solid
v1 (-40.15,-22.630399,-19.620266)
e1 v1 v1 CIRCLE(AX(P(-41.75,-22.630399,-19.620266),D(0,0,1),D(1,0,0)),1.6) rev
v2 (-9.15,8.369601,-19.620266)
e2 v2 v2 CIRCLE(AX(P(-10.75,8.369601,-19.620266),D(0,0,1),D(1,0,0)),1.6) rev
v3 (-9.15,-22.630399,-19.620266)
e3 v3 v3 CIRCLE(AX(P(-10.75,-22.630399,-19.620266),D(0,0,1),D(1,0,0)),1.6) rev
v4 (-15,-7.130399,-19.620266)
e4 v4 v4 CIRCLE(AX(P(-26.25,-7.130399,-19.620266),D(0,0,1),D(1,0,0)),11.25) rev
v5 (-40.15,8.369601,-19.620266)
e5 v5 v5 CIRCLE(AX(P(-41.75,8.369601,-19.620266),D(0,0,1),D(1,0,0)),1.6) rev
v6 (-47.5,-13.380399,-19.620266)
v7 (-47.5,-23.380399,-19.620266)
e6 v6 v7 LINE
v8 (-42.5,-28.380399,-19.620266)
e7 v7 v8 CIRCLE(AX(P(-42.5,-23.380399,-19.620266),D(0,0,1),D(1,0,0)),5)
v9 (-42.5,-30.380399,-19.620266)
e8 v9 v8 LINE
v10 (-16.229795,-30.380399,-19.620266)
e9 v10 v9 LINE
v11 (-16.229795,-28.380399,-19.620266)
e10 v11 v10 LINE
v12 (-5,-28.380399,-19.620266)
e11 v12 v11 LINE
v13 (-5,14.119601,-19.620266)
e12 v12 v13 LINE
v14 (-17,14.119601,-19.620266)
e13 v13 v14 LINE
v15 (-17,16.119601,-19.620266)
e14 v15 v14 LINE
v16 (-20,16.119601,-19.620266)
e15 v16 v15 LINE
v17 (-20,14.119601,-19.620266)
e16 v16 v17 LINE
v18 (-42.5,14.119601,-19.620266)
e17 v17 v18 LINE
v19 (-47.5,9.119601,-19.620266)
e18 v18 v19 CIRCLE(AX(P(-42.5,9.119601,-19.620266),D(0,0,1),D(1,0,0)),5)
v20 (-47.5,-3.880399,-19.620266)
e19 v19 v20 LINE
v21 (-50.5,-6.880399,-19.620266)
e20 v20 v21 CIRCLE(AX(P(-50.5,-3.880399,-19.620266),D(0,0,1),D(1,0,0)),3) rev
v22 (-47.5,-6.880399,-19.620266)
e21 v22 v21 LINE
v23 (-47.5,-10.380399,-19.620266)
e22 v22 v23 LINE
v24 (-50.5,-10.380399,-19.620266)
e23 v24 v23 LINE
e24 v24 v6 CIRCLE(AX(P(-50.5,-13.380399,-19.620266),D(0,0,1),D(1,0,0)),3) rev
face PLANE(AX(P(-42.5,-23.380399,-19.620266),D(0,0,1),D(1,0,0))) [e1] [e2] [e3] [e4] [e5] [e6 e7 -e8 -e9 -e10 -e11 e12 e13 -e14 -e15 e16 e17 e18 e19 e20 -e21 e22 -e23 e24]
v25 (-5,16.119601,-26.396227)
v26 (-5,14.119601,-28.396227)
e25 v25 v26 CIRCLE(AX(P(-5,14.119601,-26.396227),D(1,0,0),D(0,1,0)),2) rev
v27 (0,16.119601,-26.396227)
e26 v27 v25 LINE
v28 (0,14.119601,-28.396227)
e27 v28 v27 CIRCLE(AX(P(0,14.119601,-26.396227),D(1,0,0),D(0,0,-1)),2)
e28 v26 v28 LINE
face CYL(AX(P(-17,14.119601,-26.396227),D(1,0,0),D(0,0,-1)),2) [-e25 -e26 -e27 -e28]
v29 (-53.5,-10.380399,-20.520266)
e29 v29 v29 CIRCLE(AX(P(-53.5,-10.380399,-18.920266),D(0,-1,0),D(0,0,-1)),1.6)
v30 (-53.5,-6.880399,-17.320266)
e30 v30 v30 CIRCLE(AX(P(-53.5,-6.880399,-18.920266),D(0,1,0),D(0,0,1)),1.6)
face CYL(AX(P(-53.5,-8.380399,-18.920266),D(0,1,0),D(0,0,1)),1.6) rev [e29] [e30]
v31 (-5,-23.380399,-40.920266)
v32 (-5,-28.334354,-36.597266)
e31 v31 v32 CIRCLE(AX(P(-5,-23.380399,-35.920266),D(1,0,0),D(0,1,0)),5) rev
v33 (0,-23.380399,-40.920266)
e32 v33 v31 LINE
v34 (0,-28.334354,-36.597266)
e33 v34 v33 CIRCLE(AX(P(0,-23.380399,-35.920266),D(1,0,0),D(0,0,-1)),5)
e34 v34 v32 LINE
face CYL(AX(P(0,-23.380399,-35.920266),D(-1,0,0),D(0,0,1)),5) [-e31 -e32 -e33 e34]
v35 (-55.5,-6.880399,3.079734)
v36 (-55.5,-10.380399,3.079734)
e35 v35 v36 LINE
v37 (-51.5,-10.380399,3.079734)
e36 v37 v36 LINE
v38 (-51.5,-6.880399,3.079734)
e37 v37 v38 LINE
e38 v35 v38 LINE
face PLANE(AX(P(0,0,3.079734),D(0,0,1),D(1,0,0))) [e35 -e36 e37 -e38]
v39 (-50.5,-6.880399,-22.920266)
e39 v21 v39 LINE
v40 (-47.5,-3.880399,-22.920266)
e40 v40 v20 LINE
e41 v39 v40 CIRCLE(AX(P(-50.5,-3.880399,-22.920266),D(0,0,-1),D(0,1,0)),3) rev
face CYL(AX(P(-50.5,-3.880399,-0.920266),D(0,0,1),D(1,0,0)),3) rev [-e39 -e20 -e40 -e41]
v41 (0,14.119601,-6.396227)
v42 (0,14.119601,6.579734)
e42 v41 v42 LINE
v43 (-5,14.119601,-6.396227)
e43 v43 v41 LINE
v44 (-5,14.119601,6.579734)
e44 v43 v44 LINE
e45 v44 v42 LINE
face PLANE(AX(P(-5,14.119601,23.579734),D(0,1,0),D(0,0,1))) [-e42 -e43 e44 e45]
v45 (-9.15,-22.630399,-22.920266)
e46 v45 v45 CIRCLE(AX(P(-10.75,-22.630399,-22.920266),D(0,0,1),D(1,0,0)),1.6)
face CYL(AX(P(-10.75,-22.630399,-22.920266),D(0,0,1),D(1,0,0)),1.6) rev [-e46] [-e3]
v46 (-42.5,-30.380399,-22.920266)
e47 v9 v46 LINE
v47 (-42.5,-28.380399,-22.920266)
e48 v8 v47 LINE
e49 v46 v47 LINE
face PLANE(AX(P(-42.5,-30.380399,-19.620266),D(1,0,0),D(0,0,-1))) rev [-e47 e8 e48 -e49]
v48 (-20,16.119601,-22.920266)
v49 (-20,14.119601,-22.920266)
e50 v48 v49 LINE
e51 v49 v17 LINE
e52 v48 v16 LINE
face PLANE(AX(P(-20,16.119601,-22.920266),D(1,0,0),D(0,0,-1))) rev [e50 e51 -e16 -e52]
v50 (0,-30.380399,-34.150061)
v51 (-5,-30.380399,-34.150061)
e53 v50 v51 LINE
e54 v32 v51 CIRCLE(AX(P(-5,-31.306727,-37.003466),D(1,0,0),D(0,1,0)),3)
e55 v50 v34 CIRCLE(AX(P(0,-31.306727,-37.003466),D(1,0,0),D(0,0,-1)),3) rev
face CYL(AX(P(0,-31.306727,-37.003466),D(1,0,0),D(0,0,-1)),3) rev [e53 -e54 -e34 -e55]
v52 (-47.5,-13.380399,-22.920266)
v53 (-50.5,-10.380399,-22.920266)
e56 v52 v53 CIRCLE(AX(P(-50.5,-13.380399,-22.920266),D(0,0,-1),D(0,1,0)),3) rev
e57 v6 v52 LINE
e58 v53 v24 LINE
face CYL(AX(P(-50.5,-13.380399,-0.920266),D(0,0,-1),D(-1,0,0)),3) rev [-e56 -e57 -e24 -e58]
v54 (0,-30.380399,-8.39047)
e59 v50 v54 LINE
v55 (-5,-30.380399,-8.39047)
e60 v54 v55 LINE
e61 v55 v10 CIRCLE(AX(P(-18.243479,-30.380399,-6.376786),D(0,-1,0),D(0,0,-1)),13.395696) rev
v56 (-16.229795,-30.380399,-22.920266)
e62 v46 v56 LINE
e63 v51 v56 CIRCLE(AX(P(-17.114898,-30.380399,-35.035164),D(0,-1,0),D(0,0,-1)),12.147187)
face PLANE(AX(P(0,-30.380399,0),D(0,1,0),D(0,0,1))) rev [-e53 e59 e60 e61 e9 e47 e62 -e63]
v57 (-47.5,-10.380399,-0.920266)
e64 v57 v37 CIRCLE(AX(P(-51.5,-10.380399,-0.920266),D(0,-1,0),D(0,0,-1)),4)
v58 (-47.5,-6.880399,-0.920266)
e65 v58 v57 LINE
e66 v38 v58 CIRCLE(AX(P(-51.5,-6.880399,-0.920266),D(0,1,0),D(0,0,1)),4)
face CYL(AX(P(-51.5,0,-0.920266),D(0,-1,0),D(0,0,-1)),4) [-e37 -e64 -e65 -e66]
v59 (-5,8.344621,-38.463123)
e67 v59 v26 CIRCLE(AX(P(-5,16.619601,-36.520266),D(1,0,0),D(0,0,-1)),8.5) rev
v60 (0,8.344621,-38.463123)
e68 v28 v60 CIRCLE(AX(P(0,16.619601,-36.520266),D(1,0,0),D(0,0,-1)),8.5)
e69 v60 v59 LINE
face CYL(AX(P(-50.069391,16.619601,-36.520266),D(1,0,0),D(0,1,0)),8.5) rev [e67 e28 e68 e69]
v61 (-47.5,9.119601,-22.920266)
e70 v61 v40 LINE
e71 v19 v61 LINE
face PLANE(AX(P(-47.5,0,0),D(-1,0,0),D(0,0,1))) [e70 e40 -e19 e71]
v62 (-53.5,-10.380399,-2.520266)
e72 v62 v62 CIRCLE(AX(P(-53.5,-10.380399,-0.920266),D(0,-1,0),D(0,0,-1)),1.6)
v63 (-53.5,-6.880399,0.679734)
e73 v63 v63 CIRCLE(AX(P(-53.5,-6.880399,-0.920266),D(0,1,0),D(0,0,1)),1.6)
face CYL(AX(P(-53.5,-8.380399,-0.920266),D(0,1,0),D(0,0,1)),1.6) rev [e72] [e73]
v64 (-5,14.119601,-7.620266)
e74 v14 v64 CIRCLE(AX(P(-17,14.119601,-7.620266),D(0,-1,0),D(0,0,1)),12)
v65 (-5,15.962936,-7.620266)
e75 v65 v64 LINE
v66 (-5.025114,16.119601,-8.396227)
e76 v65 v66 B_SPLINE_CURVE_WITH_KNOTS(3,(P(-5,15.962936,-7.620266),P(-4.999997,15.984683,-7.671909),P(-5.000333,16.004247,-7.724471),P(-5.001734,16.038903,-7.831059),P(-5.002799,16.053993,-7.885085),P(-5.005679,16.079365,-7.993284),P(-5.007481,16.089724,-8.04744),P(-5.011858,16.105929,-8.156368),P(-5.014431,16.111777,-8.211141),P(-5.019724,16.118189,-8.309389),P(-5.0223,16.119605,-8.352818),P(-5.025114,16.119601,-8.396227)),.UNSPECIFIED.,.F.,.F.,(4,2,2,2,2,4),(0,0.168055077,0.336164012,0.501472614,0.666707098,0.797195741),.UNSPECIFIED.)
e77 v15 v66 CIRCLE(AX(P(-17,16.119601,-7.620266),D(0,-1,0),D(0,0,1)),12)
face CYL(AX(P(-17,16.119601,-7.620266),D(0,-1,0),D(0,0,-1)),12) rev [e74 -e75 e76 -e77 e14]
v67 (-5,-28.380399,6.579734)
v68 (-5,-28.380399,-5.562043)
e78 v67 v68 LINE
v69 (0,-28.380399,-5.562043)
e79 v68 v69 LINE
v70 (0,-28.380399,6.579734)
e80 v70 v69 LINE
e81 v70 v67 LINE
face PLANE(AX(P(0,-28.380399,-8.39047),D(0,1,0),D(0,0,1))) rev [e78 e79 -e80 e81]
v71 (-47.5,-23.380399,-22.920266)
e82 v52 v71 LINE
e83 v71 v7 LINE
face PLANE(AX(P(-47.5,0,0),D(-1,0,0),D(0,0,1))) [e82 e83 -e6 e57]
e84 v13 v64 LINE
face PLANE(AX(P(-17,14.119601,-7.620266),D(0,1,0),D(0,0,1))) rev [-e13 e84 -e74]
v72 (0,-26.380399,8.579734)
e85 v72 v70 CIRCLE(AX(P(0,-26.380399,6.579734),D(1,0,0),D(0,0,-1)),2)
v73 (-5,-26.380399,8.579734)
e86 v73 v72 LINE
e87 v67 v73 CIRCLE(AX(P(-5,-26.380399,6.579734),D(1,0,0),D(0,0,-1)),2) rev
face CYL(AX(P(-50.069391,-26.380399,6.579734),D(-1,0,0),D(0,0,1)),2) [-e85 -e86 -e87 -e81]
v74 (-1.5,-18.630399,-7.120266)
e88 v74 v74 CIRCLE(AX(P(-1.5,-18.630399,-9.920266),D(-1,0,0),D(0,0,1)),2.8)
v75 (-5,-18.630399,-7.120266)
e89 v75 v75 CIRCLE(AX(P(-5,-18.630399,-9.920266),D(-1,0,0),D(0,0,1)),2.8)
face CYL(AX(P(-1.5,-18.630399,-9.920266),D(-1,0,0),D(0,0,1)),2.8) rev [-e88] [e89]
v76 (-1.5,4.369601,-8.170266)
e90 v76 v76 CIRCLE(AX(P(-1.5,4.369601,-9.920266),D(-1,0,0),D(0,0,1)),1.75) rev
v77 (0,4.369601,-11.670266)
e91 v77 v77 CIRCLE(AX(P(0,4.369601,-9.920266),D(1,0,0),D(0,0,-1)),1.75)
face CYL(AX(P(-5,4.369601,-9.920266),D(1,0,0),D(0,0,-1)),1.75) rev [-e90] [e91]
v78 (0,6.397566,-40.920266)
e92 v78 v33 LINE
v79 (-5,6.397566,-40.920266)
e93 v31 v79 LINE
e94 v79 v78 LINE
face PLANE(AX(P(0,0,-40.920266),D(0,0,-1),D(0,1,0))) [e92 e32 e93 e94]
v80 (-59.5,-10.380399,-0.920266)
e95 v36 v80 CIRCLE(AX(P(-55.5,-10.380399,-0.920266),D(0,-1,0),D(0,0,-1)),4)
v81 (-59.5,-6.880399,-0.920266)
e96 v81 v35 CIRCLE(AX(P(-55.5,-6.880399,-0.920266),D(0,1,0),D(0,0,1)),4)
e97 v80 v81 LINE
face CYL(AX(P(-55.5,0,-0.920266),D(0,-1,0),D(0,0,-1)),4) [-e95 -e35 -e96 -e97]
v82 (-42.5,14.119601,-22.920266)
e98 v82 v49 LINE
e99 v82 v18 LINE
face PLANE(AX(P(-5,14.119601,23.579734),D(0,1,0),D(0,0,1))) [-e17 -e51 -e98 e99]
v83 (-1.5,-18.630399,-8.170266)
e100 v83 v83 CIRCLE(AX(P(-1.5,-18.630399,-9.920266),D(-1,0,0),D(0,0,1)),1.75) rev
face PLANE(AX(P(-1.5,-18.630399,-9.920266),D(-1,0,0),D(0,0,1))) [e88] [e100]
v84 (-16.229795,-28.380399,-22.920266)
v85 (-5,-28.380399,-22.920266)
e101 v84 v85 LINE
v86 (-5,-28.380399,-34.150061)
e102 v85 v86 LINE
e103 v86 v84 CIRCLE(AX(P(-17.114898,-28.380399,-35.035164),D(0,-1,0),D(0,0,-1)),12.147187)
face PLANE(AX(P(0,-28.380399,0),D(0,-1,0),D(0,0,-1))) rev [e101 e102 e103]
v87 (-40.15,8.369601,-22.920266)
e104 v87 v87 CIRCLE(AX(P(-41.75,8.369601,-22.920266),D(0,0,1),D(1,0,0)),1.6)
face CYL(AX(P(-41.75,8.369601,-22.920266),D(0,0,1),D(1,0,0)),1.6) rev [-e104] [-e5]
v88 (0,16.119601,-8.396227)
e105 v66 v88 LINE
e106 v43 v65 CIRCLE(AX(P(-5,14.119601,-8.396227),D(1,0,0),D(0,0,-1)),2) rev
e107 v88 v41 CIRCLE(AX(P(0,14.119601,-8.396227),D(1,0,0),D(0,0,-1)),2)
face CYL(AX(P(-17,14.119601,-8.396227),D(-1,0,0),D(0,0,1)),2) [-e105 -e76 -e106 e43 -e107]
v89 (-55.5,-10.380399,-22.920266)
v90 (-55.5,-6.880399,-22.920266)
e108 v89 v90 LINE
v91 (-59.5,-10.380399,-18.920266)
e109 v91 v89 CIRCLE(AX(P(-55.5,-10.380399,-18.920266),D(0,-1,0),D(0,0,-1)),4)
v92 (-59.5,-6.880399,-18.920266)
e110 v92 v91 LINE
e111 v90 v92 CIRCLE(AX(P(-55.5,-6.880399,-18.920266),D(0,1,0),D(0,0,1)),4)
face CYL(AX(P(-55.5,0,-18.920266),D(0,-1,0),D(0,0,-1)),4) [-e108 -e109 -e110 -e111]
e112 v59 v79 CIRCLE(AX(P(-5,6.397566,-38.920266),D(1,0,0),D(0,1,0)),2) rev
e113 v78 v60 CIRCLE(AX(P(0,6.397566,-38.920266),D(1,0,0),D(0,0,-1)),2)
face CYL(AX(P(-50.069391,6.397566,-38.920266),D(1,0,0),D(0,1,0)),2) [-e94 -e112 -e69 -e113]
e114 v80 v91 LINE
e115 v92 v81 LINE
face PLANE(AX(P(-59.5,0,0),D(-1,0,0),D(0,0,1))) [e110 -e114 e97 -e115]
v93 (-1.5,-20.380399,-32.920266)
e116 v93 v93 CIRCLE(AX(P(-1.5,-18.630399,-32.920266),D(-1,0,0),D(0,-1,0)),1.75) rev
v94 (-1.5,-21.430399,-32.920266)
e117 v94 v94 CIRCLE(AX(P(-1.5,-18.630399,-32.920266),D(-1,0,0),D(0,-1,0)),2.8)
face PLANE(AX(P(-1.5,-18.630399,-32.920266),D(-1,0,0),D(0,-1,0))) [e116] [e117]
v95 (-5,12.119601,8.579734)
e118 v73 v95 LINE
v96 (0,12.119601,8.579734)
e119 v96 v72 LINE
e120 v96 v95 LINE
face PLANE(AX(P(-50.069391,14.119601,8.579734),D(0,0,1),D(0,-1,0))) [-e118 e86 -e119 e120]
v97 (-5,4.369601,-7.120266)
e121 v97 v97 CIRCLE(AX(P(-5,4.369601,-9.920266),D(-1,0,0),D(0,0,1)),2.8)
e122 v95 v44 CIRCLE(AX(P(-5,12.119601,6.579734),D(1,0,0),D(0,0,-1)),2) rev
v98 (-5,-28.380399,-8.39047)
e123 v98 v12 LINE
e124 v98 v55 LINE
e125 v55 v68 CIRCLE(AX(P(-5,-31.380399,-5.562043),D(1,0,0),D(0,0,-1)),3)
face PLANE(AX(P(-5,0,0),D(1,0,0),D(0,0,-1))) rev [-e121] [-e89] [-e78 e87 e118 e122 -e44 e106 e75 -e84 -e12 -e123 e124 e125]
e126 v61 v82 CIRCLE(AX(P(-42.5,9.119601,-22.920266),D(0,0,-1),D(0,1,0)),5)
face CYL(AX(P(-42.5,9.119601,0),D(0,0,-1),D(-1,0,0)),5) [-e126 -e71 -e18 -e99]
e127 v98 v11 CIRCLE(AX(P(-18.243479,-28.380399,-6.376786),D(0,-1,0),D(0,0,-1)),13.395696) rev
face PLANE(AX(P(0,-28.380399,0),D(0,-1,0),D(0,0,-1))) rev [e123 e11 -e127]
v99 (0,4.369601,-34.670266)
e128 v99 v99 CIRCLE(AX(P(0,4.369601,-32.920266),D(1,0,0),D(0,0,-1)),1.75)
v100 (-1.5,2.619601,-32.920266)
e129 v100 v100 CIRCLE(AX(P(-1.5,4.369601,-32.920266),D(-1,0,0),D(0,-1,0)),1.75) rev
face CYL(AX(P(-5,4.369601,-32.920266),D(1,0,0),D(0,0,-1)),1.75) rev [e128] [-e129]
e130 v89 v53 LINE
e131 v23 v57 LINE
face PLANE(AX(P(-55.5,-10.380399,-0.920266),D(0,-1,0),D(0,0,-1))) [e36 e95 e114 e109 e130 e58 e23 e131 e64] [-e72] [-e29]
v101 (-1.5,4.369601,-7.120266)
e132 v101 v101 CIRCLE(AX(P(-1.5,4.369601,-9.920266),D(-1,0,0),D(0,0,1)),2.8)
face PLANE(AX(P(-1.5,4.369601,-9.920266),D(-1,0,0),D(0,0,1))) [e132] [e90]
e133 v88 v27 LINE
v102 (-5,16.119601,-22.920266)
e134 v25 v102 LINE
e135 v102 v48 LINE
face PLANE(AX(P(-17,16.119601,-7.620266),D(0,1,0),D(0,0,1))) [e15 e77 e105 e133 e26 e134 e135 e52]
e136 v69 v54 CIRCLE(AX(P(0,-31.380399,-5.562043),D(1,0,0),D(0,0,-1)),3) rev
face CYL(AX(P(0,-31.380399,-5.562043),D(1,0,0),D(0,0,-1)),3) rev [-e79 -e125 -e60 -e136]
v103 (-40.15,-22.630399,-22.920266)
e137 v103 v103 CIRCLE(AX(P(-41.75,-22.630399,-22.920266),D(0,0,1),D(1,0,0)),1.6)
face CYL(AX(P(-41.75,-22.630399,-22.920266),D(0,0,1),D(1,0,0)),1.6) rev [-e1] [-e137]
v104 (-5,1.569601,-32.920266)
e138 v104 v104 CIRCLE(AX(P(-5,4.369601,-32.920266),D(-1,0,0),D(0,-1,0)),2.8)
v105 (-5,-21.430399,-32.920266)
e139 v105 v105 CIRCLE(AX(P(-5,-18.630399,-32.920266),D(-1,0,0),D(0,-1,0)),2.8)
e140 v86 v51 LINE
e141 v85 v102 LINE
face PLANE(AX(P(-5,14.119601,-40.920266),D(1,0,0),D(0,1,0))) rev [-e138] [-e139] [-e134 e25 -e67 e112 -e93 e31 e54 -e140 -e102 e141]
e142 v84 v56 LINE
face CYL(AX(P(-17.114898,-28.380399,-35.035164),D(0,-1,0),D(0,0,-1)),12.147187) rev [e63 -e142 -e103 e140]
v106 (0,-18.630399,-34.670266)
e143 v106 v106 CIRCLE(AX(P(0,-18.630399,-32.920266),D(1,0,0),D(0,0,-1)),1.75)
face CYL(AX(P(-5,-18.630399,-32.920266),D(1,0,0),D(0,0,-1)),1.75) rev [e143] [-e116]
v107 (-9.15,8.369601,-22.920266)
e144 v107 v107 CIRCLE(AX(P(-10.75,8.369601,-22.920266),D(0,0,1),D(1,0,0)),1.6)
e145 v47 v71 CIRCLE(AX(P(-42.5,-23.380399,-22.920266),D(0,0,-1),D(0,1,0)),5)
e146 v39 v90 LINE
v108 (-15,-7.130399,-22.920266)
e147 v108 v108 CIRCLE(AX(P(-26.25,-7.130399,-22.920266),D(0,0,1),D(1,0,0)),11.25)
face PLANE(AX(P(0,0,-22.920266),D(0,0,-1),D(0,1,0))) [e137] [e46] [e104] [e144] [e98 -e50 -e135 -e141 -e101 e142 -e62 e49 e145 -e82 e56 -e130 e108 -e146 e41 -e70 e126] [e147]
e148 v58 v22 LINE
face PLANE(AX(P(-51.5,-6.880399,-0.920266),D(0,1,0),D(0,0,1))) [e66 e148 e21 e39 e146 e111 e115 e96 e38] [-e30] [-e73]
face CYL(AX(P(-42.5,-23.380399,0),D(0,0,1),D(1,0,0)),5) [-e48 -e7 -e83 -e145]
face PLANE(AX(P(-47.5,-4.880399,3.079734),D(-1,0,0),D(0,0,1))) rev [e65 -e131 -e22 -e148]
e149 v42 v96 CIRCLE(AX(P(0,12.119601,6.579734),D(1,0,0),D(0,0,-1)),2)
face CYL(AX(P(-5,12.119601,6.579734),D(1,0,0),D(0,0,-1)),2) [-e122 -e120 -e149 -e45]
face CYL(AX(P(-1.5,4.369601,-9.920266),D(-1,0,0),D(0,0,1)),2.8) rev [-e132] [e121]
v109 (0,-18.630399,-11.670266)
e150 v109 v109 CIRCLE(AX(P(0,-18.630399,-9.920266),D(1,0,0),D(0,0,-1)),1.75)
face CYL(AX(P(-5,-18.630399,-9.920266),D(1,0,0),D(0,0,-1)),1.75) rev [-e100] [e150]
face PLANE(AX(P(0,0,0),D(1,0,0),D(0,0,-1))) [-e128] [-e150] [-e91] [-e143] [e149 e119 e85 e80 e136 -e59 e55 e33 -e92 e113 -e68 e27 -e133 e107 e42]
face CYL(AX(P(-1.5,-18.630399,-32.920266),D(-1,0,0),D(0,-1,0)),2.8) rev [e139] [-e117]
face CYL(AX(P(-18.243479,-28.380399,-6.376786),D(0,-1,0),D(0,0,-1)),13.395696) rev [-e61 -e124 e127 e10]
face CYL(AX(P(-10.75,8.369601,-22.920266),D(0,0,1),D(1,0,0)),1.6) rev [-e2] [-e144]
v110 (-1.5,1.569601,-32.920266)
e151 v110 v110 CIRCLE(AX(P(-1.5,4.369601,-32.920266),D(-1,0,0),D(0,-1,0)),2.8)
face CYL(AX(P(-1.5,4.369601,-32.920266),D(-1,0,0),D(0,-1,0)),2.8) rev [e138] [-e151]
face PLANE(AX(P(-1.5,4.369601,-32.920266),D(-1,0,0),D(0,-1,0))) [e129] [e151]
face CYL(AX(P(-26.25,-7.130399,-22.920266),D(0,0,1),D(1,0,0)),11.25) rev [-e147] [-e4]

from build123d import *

# Parameters (mm, degrees)
CROQUIS1_W               = 42.5
CROQUIS1_H               = 42.5
SALIENTE_EXTRUIR1_DEPTH  = 5
CROQUIS6_W               = 5
CROQUIS6_H               = 42.5
SALIENTE_EXTRUIR2_DEPTH  = 4
CROQUIS7_W               = 4
CROQUIS7_H               = 42.5
SALIENTE_EXTRUIR3_DEPTH  = 42.5
CROQUIS8_R               = 11.25
CROQUIS8_R_2             = 1.6
CORTAR_EXTRUIR2_DEPTH    = 4
CROQUIS10_W              = 4
CROQUIS10_H              = 3.5
SALIENTE_EXTRUIR4_DEPTH  = 12
CROQUIS11_W              = 12
CROQUIS11_H              = 3.5
SALIENTE_EXTRUIR5_DEPTH  = 22
CROQUIS12_R              = 1.6
CORTAR_EXTRUIR4_DEPTH    = 3.5
REDONDEO1_R              = 5
REDONDEO2_R              = 5
REDONDEO3_R              = 4
CORTAR_EXTRUIR5_DEPTH    = 0.7
CROQUIS14_W              = 5
CROQUIS14_H              = 42.5
SALIENTE_EXTRUIR6_DEPTH  = 18
CROQUIS15_R              = 1.75
CORTAR_EXTRUIR6_DEPTH    = 5
CROQUIS16_R              = 2.8
CORTAR_EXTRUIR7_DEPTH    = 3.5
CROQUIS17_R              = 2.8
CORTAR_EXTRUIR8_DEPTH    = 3.5
REDONDEO5_R              = 5
CROQUIS18_R              = 1.6
SALIENTE_EXTRUIR8_DEPTH  = 2
CROQUIS19_R              = 1.6
CORTAR_EXTRUIR9_DEPTH    = 2
REDONDEO7_R              = 3
REDONDEO8_R              = 3
SALIENTE_EXTRUIR9_DEPTH  = 2
SALIENTE_EXTRUIR10_DEPTH = 2
CROQUIS22_W              = 26.97020456
CROQUIS22_H              = 2
CORTAR_EXTRUIR10_DEPTH   = 5
CROQUIS23_W              = 1.770204561
CROQUIS23_H              = 2
CORTAR_EXTRUIR11_DEPTH   = 5
REDONDEO9_R              = 3
CORTAR_EXTRUIR12_START   = -5
CORTAR_EXTRUIR12_DEPTH   = 5
REDONDEO10_R             = 2
SALIENTE_EXTRUIR11_DEPTH = 2
REDONDEO11_R             = 2


# Some blends are built 0.0001 mm under size
with BuildPart() as part:
    # Croquis1 → Saliente-Extruir1 (new body)
    with BuildSketch(Plane(origin=(0, 0, 0), x_dir=(0, 0, -1), z_dir=(1, 0, 0))):
        with Locations((-2.329734219, -7.130398671)):
            Rectangle(CROQUIS1_W, CROQUIS1_H)
    extrude(amount=-SALIENTE_EXTRUIR1_DEPTH)

    # Croquis6 → Saliente-Extruir2 (add)
    with BuildSketch(Plane(origin=(0, 0, -18.920265781), x_dir=(-1, 0, 0), z_dir=(0, 0, -1))):
        with Locations((2.5, -7.130398671)):
            Rectangle(CROQUIS6_W, CROQUIS6_H)
    extrude(amount=SALIENTE_EXTRUIR2_DEPTH)

    # Croquis7 → Saliente-Extruir3 (add)
    with BuildSketch(Plane.ZY.offset(5)):
        with Locations((-20.920265781, -7.130398671)):
            Rectangle(CROQUIS7_W, CROQUIS7_H)
    extrude(amount=SALIENTE_EXTRUIR3_DEPTH)

    # Croquis8 → Cortar-Extruir2 (cut)
    with BuildSketch(Plane.XY.offset(-18.920265781)):
        with Locations((-26.25, -7.130398671)):
            Circle(CROQUIS8_R)
        with Locations((-41.75, 8.369601329)):
            Circle(CROQUIS8_R_2)
        with Locations((-10.75, 8.369601329)):
            Circle(CROQUIS8_R_2)
        with Locations((-10.75, -22.630398671)):
            Circle(CROQUIS8_R_2)
        with Locations((-41.75, -22.630398671)):
            Circle(CROQUIS8_R_2)
    extrude(amount=-CORTAR_EXTRUIR2_DEPTH, mode=Mode.SUBTRACT)

    # Croquis10 → Saliente-Extruir4 (add)
    with BuildSketch(Plane.ZY.offset(47.5)):
        with Locations((-20.920265781, -6.630398671)):
            Rectangle(CROQUIS10_W, CROQUIS10_H)
    extrude(amount=SALIENTE_EXTRUIR4_DEPTH)

    # Croquis11 → Saliente-Extruir5 (add)
    with BuildSketch(Plane.XY.offset(-18.920265781)):
        with Locations((-53.5, -6.630398671)):
            Rectangle(CROQUIS11_W, CROQUIS11_H)
    extrude(amount=SALIENTE_EXTRUIR5_DEPTH)

    # Croquis12 → Cortar-Extruir4 (cut)
    with BuildSketch(Plane(origin=(0, -4.880398671, 0), x_dir=(1, 0, 0), z_dir=(0, 1, 0))):
        with Locations(Location((-53.5, 18.920265781, 0), (0, 0, 270))):
            Circle(CROQUIS12_R)
        with Locations(Location((-53.5, 0.920265781, 0), (0, 0, 270))):
            Circle(CROQUIS12_R)
    extrude(amount=-CORTAR_EXTRUIR4_DEPTH, mode=Mode.SUBTRACT)

    # Redondeo1
    redondeo1_edges = [part.edges().sort_by_distance(p)[0] for p in [
        (-2.5, -28.380398671, 23.579734219),
        (-2.5, 14.119601329, 23.579734219),
    ]]
    fillet(redondeo1_edges, radius=REDONDEO1_R)

    # Redondeo2
    redondeo2_edges = [part.edges().sort_by_distance(p)[0] for p in [
        (-47.5, -28.380398671, -20.920265781),
        (-47.5, 14.119601329, -20.920265781),
    ]]
    fillet(redondeo2_edges, radius=REDONDEO2_R)

    # Redondeo3
    redondeo3_edges = [part.edges().sort_by_distance(p)[0] for p in [
        (-59.5, -6.630398671, -22.920265781),
        (-59.5, -6.630398671, 3.079734219),
        (-47.5, -6.630398671, 3.079734219),
    ]]
    fillet(redondeo3_edges, radius=REDONDEO3_R)

    # Croquis13 → Cortar-Extruir5 (cut)
    with BuildSketch(Plane.XY.offset(-18.920265781)):
        with BuildLine():
            Line((-47.5, -8.380398671), (-47.5, -23.380398671))
            ThreePointArc((-47.5, -23.380398671), (-46.035533906, -26.915932577), (-42.5, -28.380398671))
            Line((-42.5, -28.380398671), (-5, -28.380398671))
            Line((-5, -28.380398671), (-5, 14.119601329))
            Line((-5, 14.119601329), (-42.5, 14.119601329))
            ThreePointArc((-42.5, 14.119601329), (-46.035533906, 12.655135235), (-47.5, 9.119601329))
            Line((-47.5, 9.119601329), (-47.5, -4.880398671))
            Line((-47.5, -4.880398671), (-47.5, -8.380398671))
        make_face()
    extrude(amount=-CORTAR_EXTRUIR5_DEPTH, mode=Mode.SUBTRACT)

    # Croquis14 → Saliente-Extruir6 (add)
    with BuildSketch(Plane(origin=(0, 0, -22.920265781), x_dir=(-1, 0, 0), z_dir=(0, 0, -1))):
        with Locations((2.5, -7.130398671)):
            Rectangle(CROQUIS14_W, CROQUIS14_H)
    extrude(amount=SALIENTE_EXTRUIR6_DEPTH)

    # Croquis15 → Cortar-Extruir6 (cut)
    with BuildSketch(Plane(origin=(0, 0, 0), x_dir=(0, 0, -1), z_dir=(1, 0, 0))):
        with Locations((9.920265781, 4.369601329)):
            Circle(CROQUIS15_R)
        with Locations((32.920265781, 4.369601329)):
            Circle(CROQUIS15_R)
        with Locations((32.920265781, -18.630398671)):
            Circle(CROQUIS15_R)
        with Locations((9.920265781, -18.630398671)):
            Circle(CROQUIS15_R)
    extrude(amount=-CORTAR_EXTRUIR6_DEPTH, mode=Mode.SUBTRACT)

    # Croquis16 → Cortar-Extruir7 (cut)
    with BuildSketch(Plane.ZY.offset(5)):
        with Locations((-9.920265781, 4.369601329)):
            Circle(CROQUIS16_R)
        with Locations((-9.920265781, -18.630398671)):
            Circle(CROQUIS16_R)
    extrude(amount=-CORTAR_EXTRUIR7_DEPTH, mode=Mode.SUBTRACT)

    # Croquis17 → Cortar-Extruir8 (cut)
    with BuildSketch(Plane.ZY.offset(5)):
        with Locations(Location((-32.920265781, 4.369601329, 0), (0, 0, 270))):
            Circle(CROQUIS17_R)
        with Locations(Location((-32.920265781, -18.630398671, 0), (0, 0, 270))):
            Circle(CROQUIS17_R)
    extrude(amount=-CORTAR_EXTRUIR8_DEPTH, mode=Mode.SUBTRACT)

    # Redondeo5
    redondeo5_edges = [part.edges().sort_by_distance(p)[0] for p in [
        (-2.5, -28.380398671, -40.920265781),
        (-2.5, 14.119601329, -40.920265781),
    ]]
    fillet(redondeo5_edges, radius=REDONDEO5_R)

    # Croquis18 → Saliente-Extruir8 (add)
    with BuildSketch(Plane.XZ.offset(8.380398671)):
        with BuildLine():
            Line((-59.5, -0.920265781), (-59.5, -18.920265781))
            ThreePointArc((-59.5, -18.920265781), (-58.328427125, -21.748692905), (-55.5, -22.920265781))
            Line((-55.5, -22.920265781), (-47.5, -22.920265781))
            Line((-47.5, -22.920265781), (-47.5, -19.620265781))
            Line((-47.5, -19.620265781), (-47.5, -0.920265781))
            ThreePointArc((-47.5, -0.920265781), (-48.671572875, 1.908161344), (-51.5, 3.079734219))
            Line((-51.5, 3.079734219), (-55.5, 3.079734219))
            ThreePointArc((-55.5, 3.079734219), (-58.328427125, 1.908161344), (-59.5, -0.920265781))
        make_face()
        with Locations(Location((-53.5, -0.920265781, 0), (0, 0, 90))):
            Circle(CROQUIS18_R, mode=Mode.SUBTRACT)
        with Locations(Location((-53.5, -18.920265781, 0), (0, 0, 90))):
            Circle(CROQUIS18_R, mode=Mode.SUBTRACT)
    extrude(amount=SALIENTE_EXTRUIR8_DEPTH)

    # Croquis19 → Cortar-Extruir9 (cut)
    with BuildSketch(Plane(origin=(0, -4.880398671, 0), x_dir=(1, 0, 0), z_dir=(0, 1, 0))):
        with BuildLine():
            Line((-51.5, -3.079734219), (-55.5, -3.079734219))
            ThreePointArc((-55.5, -3.079734219), (-58.328427125, -1.908161344), (-59.5, 0.920265781))
            Line((-59.5, 0.920265781), (-59.5, 18.920265781))
            ThreePointArc((-59.5, 18.920265781), (-58.328427125, 21.748692905), (-55.5, 22.920265781))
            Line((-55.5, 22.920265781), (-47.5, 22.920265781))
            Line((-47.5, 22.920265781), (-47.5, 19.620265781))
            Line((-47.5, 19.620265781), (-47.5, 0.920265781))
            ThreePointArc((-47.5, 0.920265781), (-48.671572875, -1.908161344), (-51.5, -3.079734219))
        make_face()
        with Locations(Location((-53.5, 18.920265781, 0), (0, 0, 270))):
            Circle(CROQUIS19_R, mode=Mode.SUBTRACT)
        with Locations(Location((-53.5, 0.920265781, 0), (0, 0, 270))):
            Circle(CROQUIS19_R, mode=Mode.SUBTRACT)
    extrude(amount=-CORTAR_EXTRUIR9_DEPTH, mode=Mode.SUBTRACT)

    # Redondeo7
    redondeo7_edges = [part.edges().sort_by_distance(p)[0] for p in [
        (-47.5, -6.880398671, -21.270265781),
    ]]
    fillet(redondeo7_edges, radius=REDONDEO7_R)

    # Redondeo8
    redondeo8_edges = [part.edges().sort_by_distance(p)[0] for p in [
        (-47.5, -10.380398671, -21.270265781),
    ]]
    fillet(redondeo8_edges, radius=REDONDEO8_R)

    # Croquis20 → Saliente-Extruir9 (add)
    with BuildSketch(Plane.XZ.offset(28.380398671)):
        Polygon((-5, -22.920265781), (-5, -35.920265781), (0, -35.920265781), (0, 18.579734219), (-5, 18.579734219), (-5, -19.620265781), (-42.5, -19.620265781), (-42.5, -22.920265781), align=None)
    extrude(amount=SALIENTE_EXTRUIR9_DEPTH)

    # Croquis21 → Saliente-Extruir10 (add)
    with BuildSketch(Plane.XZ.offset(30.380398671)):
        with BuildLine():
            Line((-16.22979544, -19.620265781), (-5, -19.620265781))
            Line((-5, -19.620265781), (-5, -8.390470341))
            ThreePointArc((-5, -8.390470341), (-8.771291942, -15.848973839), (-16.22979544, -19.620265781))
        make_face()
        with BuildLine():
            ThreePointArc((-16.22979544, -22.920265781), (-8.525539397, -26.445805177), (-5, -34.15006122))
            Line((-5, -34.15006122), (-5, -22.920265781))
            Line((-5, -22.920265781), (-16.22979544, -22.920265781))
        make_face()
    extrude(amount=-SALIENTE_EXTRUIR10_DEPTH)

    # Croquis22 → Cortar-Extruir10 (cut)
    with BuildSketch(Plane.ZY.offset(5)):
        with Locations((5.094631939, -29.380398671)):
            Rectangle(CROQUIS22_W, CROQUIS22_H)
    extrude(amount=-CORTAR_EXTRUIR10_DEPTH, mode=Mode.SUBTRACT)

    # Croquis23 → Cortar-Extruir11 (cut)
    with BuildSketch(Plane.ZY.offset(5)):
        with Locations((-35.035163501, -29.380398671)):
            Rectangle(CROQUIS23_W, CROQUIS23_H)
    extrude(amount=-CORTAR_EXTRUIR11_DEPTH, mode=Mode.SUBTRACT)

    # Redondeo9
    # the kernel refuses this fillet: 3 mm, written as the material it adds along each edge
    with BuildSketch(Plane(origin=(-5, -28.380398671, -34.15006122), x_dir=(0, -1, 0), z_dir=(1, 0, 0))) as redondeo9_piece_1:
        with BuildLine():
            CenterArc((2.926328174, 2.853404303), REDONDEO9_R, 187.781748717, 64.232765745)
            Line((-0.046044891, 2.447204399), (-0.343282198, 2.406584409))
            ThreePointArc((-0.343282198, 2.406584409), (-0.3, 1.77020456), (-0.3, 0))
            Line((-0.3, 0), (0, -0.3))
            ThreePointArc((0, -0.3), (1, -0.3), (1.907367183, -0.28534043))
            Line((1.907367183, -0.28534043), (2, 0))
        make_face()
    extrude(amount=5)
    with BuildSketch(Plane(origin=(-5, -28.380398671, -8.390470341), x_dir=(0, -1, 0), z_dir=(1, 0, 0))) as redondeo9_piece_2:
        with BuildLine():
            CenterArc((3, -2.828427125), REDONDEO9_R, 109.471220634, 70.528779366)
            Line((0, -2.828427125), (0, 0))
            Line((0, 0), (2, 0))
        make_face()
    extrude(amount=5)

    # Croquis24 → Cortar-Extruir12 (cut)
    with BuildSketch(Plane(origin=(0, 0, 0), x_dir=(0, 0, -1), z_dir=(1, 0, 0)).offset(CORTAR_EXTRUIR12_START)):
        with BuildLine():
            Line((-18.579734219, -28.380398671), (-8.579734219, -28.380398671))
            Line((-8.579734219, -28.380398671), (-8.579734219, 14.119601329))
            Line((-8.579734219, 14.119601329), (-18.579734219, 14.119601329))
            ThreePointArc((-18.579734219, 14.119601329), (-22.115268125, 12.655135235), (-23.579734219, 9.119601329))
            Line((-23.579734219, 9.119601329), (-23.579734219, -23.380398671))
            ThreePointArc((-23.579734219, -23.380398671), (-22.115268125, -26.915932577), (-18.579734219, -28.380398671))
        make_face()
        with BuildLine():
            Line((35.920265781, 14.119601329), (28.396227376, 14.119601329))
            ThreePointArc((28.396227376, 14.119601329), (33.490730397, 8.677818446), (40.915227569, 9.344004386))
            ThreePointArc((40.915227569, 9.344004386), (39.375550481, 12.73360294), (35.920265781, 14.119601329))
        make_face()
    extrude(amount=CORTAR_EXTRUIR12_DEPTH, mode=Mode.SUBTRACT)

    # Redondeo10
    redondeo10_edges = [part.edges().sort_by_distance(p)[0] for p in [
        (-2.5, 9.344004386, -40.915227569),
        (-2.5, -28.380398671, 8.579734219),
        (-2.5, 14.119601329, 8.579734219),
    ]]
    fillet(redondeo10_edges, radius=REDONDEO10_R)

    # Croquis25 → Saliente-Extruir11 (add)
    with BuildSketch(Plane(origin=(0, 14.119601329, 0), x_dir=(1, 0, 0), z_dir=(0, 1, 0))):
        with BuildLine():
            Line((-20, 22.920265781), (-20, 19.620265781))
            Line((-20, 19.620265781), (-17, 19.620265781))
            ThreePointArc((-17, 19.620265781), (-8.514718626, 16.105547155), (-5, 7.620265781))
            Line((-5, 7.620265781), (-5, 6.396227376))
            Line((-5, 6.396227376), (0, 6.396227376))
            Line((0, 6.396227376), (0, 28.396227376))
            Line((0, 28.396227376), (-5, 28.396227376))
            Line((-5, 28.396227376), (-5, 22.920265781))
            Line((-5, 22.920265781), (-20, 22.920265781))
        make_face()
    extrude(amount=SALIENTE_EXTRUIR11_DEPTH)

    # Redondeo11
    redondeo11_edges = [part.edges().sort_by_distance(p)[0] for p in [
        (-2.5, 16.119601329, -28.396227376),
        (-2.5, 16.119601329, -6.396227376),
    ]]
    fillet(redondeo11_edges, radius=REDONDEO11_R - 0.0001)  # a hair under: the kernel refuses the full size


solid = part.part
